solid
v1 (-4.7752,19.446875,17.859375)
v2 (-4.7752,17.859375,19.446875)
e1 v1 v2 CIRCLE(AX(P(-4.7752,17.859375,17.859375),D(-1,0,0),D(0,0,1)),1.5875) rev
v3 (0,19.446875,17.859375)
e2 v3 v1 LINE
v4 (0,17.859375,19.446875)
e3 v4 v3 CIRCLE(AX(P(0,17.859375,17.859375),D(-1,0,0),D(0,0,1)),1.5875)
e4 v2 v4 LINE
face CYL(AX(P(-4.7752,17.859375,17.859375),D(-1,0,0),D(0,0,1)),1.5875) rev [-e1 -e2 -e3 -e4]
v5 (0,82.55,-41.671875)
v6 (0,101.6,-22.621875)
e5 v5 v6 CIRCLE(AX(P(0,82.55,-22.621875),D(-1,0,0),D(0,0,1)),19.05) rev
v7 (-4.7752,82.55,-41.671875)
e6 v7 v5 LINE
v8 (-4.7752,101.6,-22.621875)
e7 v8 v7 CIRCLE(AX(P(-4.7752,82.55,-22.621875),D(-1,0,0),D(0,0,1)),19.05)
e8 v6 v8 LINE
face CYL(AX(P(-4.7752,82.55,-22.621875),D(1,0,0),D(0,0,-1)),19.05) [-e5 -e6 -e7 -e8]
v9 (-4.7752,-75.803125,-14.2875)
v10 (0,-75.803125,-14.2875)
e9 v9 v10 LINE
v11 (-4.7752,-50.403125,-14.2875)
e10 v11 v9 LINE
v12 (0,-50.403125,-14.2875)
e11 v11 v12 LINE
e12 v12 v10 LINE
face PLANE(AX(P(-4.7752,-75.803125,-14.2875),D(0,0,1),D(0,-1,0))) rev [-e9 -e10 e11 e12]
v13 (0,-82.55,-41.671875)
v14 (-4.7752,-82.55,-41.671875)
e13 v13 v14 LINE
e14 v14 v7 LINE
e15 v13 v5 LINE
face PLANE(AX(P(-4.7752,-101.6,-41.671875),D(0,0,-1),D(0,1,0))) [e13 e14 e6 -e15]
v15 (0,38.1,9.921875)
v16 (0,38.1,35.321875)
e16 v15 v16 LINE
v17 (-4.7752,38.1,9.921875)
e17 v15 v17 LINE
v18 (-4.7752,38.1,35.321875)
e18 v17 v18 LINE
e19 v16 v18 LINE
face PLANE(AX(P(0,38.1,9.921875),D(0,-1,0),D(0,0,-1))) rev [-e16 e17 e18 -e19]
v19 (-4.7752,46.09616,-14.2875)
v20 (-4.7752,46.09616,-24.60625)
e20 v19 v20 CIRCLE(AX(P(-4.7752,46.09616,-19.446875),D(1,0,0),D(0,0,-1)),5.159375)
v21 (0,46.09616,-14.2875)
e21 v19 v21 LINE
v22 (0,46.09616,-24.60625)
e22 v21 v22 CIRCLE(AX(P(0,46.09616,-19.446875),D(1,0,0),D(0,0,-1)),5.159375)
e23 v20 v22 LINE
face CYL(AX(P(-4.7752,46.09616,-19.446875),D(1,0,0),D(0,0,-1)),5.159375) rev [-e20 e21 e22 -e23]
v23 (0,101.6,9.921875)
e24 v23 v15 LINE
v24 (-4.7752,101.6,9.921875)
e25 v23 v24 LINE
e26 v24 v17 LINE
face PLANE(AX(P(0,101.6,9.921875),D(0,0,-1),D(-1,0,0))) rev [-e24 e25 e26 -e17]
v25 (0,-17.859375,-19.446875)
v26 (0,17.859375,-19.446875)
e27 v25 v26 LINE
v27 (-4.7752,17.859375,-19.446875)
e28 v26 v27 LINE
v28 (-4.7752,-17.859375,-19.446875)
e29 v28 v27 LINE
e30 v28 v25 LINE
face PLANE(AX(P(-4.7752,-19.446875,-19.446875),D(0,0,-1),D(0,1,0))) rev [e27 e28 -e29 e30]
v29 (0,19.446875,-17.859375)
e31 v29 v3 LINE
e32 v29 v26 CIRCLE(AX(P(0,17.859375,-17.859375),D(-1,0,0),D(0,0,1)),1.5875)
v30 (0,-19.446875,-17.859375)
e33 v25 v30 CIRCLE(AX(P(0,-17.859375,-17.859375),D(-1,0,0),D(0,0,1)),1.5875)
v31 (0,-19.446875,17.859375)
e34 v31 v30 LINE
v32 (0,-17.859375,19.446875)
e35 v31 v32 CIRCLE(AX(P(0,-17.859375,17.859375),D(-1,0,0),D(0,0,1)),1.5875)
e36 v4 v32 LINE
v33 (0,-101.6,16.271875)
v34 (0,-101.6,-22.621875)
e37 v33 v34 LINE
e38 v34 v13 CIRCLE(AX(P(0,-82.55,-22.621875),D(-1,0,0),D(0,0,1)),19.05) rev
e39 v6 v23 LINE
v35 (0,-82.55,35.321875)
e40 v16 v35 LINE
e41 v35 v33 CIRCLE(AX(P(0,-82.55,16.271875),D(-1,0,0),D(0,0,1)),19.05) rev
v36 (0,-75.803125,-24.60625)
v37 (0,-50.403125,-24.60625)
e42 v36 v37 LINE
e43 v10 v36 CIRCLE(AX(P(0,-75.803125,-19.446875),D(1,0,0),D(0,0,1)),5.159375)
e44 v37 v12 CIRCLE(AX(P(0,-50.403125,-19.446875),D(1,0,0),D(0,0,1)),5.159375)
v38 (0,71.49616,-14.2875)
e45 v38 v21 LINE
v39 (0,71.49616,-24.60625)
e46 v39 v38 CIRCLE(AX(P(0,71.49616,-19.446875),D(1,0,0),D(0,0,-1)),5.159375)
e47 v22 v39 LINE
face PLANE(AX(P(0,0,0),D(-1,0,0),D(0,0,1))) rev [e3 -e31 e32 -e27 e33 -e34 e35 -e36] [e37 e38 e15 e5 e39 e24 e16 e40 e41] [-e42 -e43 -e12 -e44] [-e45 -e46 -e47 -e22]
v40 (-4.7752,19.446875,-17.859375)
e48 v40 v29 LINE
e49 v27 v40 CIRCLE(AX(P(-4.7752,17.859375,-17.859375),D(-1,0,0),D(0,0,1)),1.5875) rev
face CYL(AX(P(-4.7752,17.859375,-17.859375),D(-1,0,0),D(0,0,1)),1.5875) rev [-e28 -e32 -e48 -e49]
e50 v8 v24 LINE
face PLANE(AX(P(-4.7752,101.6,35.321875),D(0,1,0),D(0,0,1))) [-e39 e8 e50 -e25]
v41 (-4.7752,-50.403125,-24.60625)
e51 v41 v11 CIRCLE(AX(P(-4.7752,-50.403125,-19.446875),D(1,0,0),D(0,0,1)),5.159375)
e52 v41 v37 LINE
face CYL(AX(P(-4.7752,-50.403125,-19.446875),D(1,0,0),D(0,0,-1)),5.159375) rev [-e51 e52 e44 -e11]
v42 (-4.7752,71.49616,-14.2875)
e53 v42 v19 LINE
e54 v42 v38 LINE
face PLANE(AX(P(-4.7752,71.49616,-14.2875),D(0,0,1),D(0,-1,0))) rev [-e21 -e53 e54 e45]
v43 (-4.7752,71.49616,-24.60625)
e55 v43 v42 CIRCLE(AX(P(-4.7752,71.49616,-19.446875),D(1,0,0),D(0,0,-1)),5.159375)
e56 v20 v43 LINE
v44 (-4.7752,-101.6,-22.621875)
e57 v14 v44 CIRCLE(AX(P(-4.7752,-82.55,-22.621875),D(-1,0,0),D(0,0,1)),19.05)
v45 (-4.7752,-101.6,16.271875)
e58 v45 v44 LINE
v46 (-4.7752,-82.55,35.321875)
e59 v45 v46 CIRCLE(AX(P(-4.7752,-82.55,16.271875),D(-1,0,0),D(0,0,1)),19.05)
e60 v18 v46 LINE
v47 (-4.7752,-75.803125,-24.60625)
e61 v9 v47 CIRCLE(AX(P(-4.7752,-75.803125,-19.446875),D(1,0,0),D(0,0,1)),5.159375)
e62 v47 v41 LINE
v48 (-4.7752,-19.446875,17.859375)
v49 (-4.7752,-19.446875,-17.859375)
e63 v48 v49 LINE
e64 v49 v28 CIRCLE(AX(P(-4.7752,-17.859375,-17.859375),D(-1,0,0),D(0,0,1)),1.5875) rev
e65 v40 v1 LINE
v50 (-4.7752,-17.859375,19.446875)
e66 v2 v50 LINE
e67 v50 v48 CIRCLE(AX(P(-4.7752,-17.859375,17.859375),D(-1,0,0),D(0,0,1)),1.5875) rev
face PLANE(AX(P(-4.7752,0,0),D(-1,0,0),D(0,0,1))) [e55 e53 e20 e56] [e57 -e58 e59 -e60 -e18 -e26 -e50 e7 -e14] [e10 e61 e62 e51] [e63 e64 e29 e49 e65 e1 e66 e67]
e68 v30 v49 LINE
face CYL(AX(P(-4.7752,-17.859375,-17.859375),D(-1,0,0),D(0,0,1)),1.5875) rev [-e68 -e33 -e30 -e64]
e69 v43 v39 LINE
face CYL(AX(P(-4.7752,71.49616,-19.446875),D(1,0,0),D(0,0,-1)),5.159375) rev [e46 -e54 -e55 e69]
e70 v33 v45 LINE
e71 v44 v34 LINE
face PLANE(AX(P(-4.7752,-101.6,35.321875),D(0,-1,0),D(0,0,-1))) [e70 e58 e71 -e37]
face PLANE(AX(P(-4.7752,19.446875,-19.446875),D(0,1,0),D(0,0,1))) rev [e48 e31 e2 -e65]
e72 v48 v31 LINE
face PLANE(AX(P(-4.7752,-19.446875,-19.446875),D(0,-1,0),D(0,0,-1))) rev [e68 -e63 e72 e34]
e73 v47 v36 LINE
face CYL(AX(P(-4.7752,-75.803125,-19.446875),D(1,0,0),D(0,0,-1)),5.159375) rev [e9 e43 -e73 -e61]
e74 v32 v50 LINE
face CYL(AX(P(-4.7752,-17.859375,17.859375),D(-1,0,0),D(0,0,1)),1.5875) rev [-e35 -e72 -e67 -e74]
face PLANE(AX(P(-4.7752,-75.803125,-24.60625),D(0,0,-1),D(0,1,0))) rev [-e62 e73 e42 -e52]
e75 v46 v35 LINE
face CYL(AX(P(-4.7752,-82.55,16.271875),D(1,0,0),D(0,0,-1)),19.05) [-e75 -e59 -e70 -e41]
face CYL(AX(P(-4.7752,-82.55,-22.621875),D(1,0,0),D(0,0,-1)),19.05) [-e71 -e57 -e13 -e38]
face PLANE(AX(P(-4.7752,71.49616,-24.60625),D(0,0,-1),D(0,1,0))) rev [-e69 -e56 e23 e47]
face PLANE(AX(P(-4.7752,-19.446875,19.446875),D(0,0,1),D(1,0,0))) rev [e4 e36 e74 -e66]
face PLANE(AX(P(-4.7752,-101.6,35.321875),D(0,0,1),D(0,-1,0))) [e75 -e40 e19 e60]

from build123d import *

# Parameters (mm, degrees)
SKETCH1_W          = 76.99375
SKETCH1_H          = 203.2
SKETCH1_W_2        = 38.89375
SKETCH1_H_2        = 38.89375
BASE_FLANGE1_DEPTH = 4.7752
FILLET1_R          = 1.5875
FILLET2_R          = 19.05
SKETCH2_W          = 25.4
SKETCH2_H          = 63.5
CUT_EXTRUDE1_DEPTH = 110.917731513


# Sheet-metal steps are written as plain solids
with BuildPart() as part:
    # Sketch1 → Base-Flange1 (new body)
    with BuildSketch(Plane(origin=(0, 0, 0), x_dir=(0, 0, -1), z_dir=(1, 0, 0))):
        with Locations((3.175, 0)):
            Rectangle(SKETCH1_W, SKETCH1_H)
        Rectangle(SKETCH1_W_2, SKETCH1_H_2, mode=Mode.SUBTRACT)
        with BuildLine():
            Line((24.60625, 71.496159823), (24.60625, 46.096159823))
            ThreePointArc((24.60625, 46.096159823), (19.446875, 40.936784823), (14.2875, 46.096159823))
            Line((14.2875, 46.096159823), (14.2875, 71.496159823))
            ThreePointArc((14.2875, 71.496159823), (19.446875, 76.655534823), (24.60625, 71.496159823))
        make_face(mode=Mode.SUBTRACT)
        with BuildLine():
            Line((24.60625, -75.803125), (24.60625, -50.403125))
            ThreePointArc((24.60625, -50.403125), (19.446875, -45.24375), (14.2875, -50.403125))
            Line((14.2875, -50.403125), (14.2875, -75.803125))
            ThreePointArc((14.2875, -75.803125), (19.446875, -80.9625), (24.60625, -75.803125))
        make_face(mode=Mode.SUBTRACT)
    extrude(amount=-BASE_FLANGE1_DEPTH)

    # Fillet1
    fillet1_edges = [part.edges().sort_by_distance(p)[0] for p in [
        (-2.3876, -19.446875, 19.446875),
        (-2.3876, 19.446875, 19.446875),
        (-2.3876, 19.446875, -19.446875),
        (-2.3876, -19.446875, -19.446875),
    ]]
    fillet(fillet1_edges, radius=FILLET1_R)

    # Fillet2
    fillet2_edges = [part.edges().sort_by_distance(p)[0] for p in [
        (-2.3876, -101.6, -41.671875),
        (-2.3876, -101.6, 35.321875),
        (-2.3876, 101.6, 35.321875),
        (-2.3876, 101.6, -41.671875),
    ]]
    fillet(fillet2_edges, radius=FILLET2_R)

    # Sketch2 → Cut-Extrude1 (cut, through all)
    with BuildSketch(Plane.ZY.offset(4.7752)):
        with Locations((22.621875, 69.85)):
            Rectangle(SKETCH2_W, SKETCH2_H)
    extrude(amount=-CUT_EXTRUDE1_DEPTH, mode=Mode.SUBTRACT)


solid = part.part
